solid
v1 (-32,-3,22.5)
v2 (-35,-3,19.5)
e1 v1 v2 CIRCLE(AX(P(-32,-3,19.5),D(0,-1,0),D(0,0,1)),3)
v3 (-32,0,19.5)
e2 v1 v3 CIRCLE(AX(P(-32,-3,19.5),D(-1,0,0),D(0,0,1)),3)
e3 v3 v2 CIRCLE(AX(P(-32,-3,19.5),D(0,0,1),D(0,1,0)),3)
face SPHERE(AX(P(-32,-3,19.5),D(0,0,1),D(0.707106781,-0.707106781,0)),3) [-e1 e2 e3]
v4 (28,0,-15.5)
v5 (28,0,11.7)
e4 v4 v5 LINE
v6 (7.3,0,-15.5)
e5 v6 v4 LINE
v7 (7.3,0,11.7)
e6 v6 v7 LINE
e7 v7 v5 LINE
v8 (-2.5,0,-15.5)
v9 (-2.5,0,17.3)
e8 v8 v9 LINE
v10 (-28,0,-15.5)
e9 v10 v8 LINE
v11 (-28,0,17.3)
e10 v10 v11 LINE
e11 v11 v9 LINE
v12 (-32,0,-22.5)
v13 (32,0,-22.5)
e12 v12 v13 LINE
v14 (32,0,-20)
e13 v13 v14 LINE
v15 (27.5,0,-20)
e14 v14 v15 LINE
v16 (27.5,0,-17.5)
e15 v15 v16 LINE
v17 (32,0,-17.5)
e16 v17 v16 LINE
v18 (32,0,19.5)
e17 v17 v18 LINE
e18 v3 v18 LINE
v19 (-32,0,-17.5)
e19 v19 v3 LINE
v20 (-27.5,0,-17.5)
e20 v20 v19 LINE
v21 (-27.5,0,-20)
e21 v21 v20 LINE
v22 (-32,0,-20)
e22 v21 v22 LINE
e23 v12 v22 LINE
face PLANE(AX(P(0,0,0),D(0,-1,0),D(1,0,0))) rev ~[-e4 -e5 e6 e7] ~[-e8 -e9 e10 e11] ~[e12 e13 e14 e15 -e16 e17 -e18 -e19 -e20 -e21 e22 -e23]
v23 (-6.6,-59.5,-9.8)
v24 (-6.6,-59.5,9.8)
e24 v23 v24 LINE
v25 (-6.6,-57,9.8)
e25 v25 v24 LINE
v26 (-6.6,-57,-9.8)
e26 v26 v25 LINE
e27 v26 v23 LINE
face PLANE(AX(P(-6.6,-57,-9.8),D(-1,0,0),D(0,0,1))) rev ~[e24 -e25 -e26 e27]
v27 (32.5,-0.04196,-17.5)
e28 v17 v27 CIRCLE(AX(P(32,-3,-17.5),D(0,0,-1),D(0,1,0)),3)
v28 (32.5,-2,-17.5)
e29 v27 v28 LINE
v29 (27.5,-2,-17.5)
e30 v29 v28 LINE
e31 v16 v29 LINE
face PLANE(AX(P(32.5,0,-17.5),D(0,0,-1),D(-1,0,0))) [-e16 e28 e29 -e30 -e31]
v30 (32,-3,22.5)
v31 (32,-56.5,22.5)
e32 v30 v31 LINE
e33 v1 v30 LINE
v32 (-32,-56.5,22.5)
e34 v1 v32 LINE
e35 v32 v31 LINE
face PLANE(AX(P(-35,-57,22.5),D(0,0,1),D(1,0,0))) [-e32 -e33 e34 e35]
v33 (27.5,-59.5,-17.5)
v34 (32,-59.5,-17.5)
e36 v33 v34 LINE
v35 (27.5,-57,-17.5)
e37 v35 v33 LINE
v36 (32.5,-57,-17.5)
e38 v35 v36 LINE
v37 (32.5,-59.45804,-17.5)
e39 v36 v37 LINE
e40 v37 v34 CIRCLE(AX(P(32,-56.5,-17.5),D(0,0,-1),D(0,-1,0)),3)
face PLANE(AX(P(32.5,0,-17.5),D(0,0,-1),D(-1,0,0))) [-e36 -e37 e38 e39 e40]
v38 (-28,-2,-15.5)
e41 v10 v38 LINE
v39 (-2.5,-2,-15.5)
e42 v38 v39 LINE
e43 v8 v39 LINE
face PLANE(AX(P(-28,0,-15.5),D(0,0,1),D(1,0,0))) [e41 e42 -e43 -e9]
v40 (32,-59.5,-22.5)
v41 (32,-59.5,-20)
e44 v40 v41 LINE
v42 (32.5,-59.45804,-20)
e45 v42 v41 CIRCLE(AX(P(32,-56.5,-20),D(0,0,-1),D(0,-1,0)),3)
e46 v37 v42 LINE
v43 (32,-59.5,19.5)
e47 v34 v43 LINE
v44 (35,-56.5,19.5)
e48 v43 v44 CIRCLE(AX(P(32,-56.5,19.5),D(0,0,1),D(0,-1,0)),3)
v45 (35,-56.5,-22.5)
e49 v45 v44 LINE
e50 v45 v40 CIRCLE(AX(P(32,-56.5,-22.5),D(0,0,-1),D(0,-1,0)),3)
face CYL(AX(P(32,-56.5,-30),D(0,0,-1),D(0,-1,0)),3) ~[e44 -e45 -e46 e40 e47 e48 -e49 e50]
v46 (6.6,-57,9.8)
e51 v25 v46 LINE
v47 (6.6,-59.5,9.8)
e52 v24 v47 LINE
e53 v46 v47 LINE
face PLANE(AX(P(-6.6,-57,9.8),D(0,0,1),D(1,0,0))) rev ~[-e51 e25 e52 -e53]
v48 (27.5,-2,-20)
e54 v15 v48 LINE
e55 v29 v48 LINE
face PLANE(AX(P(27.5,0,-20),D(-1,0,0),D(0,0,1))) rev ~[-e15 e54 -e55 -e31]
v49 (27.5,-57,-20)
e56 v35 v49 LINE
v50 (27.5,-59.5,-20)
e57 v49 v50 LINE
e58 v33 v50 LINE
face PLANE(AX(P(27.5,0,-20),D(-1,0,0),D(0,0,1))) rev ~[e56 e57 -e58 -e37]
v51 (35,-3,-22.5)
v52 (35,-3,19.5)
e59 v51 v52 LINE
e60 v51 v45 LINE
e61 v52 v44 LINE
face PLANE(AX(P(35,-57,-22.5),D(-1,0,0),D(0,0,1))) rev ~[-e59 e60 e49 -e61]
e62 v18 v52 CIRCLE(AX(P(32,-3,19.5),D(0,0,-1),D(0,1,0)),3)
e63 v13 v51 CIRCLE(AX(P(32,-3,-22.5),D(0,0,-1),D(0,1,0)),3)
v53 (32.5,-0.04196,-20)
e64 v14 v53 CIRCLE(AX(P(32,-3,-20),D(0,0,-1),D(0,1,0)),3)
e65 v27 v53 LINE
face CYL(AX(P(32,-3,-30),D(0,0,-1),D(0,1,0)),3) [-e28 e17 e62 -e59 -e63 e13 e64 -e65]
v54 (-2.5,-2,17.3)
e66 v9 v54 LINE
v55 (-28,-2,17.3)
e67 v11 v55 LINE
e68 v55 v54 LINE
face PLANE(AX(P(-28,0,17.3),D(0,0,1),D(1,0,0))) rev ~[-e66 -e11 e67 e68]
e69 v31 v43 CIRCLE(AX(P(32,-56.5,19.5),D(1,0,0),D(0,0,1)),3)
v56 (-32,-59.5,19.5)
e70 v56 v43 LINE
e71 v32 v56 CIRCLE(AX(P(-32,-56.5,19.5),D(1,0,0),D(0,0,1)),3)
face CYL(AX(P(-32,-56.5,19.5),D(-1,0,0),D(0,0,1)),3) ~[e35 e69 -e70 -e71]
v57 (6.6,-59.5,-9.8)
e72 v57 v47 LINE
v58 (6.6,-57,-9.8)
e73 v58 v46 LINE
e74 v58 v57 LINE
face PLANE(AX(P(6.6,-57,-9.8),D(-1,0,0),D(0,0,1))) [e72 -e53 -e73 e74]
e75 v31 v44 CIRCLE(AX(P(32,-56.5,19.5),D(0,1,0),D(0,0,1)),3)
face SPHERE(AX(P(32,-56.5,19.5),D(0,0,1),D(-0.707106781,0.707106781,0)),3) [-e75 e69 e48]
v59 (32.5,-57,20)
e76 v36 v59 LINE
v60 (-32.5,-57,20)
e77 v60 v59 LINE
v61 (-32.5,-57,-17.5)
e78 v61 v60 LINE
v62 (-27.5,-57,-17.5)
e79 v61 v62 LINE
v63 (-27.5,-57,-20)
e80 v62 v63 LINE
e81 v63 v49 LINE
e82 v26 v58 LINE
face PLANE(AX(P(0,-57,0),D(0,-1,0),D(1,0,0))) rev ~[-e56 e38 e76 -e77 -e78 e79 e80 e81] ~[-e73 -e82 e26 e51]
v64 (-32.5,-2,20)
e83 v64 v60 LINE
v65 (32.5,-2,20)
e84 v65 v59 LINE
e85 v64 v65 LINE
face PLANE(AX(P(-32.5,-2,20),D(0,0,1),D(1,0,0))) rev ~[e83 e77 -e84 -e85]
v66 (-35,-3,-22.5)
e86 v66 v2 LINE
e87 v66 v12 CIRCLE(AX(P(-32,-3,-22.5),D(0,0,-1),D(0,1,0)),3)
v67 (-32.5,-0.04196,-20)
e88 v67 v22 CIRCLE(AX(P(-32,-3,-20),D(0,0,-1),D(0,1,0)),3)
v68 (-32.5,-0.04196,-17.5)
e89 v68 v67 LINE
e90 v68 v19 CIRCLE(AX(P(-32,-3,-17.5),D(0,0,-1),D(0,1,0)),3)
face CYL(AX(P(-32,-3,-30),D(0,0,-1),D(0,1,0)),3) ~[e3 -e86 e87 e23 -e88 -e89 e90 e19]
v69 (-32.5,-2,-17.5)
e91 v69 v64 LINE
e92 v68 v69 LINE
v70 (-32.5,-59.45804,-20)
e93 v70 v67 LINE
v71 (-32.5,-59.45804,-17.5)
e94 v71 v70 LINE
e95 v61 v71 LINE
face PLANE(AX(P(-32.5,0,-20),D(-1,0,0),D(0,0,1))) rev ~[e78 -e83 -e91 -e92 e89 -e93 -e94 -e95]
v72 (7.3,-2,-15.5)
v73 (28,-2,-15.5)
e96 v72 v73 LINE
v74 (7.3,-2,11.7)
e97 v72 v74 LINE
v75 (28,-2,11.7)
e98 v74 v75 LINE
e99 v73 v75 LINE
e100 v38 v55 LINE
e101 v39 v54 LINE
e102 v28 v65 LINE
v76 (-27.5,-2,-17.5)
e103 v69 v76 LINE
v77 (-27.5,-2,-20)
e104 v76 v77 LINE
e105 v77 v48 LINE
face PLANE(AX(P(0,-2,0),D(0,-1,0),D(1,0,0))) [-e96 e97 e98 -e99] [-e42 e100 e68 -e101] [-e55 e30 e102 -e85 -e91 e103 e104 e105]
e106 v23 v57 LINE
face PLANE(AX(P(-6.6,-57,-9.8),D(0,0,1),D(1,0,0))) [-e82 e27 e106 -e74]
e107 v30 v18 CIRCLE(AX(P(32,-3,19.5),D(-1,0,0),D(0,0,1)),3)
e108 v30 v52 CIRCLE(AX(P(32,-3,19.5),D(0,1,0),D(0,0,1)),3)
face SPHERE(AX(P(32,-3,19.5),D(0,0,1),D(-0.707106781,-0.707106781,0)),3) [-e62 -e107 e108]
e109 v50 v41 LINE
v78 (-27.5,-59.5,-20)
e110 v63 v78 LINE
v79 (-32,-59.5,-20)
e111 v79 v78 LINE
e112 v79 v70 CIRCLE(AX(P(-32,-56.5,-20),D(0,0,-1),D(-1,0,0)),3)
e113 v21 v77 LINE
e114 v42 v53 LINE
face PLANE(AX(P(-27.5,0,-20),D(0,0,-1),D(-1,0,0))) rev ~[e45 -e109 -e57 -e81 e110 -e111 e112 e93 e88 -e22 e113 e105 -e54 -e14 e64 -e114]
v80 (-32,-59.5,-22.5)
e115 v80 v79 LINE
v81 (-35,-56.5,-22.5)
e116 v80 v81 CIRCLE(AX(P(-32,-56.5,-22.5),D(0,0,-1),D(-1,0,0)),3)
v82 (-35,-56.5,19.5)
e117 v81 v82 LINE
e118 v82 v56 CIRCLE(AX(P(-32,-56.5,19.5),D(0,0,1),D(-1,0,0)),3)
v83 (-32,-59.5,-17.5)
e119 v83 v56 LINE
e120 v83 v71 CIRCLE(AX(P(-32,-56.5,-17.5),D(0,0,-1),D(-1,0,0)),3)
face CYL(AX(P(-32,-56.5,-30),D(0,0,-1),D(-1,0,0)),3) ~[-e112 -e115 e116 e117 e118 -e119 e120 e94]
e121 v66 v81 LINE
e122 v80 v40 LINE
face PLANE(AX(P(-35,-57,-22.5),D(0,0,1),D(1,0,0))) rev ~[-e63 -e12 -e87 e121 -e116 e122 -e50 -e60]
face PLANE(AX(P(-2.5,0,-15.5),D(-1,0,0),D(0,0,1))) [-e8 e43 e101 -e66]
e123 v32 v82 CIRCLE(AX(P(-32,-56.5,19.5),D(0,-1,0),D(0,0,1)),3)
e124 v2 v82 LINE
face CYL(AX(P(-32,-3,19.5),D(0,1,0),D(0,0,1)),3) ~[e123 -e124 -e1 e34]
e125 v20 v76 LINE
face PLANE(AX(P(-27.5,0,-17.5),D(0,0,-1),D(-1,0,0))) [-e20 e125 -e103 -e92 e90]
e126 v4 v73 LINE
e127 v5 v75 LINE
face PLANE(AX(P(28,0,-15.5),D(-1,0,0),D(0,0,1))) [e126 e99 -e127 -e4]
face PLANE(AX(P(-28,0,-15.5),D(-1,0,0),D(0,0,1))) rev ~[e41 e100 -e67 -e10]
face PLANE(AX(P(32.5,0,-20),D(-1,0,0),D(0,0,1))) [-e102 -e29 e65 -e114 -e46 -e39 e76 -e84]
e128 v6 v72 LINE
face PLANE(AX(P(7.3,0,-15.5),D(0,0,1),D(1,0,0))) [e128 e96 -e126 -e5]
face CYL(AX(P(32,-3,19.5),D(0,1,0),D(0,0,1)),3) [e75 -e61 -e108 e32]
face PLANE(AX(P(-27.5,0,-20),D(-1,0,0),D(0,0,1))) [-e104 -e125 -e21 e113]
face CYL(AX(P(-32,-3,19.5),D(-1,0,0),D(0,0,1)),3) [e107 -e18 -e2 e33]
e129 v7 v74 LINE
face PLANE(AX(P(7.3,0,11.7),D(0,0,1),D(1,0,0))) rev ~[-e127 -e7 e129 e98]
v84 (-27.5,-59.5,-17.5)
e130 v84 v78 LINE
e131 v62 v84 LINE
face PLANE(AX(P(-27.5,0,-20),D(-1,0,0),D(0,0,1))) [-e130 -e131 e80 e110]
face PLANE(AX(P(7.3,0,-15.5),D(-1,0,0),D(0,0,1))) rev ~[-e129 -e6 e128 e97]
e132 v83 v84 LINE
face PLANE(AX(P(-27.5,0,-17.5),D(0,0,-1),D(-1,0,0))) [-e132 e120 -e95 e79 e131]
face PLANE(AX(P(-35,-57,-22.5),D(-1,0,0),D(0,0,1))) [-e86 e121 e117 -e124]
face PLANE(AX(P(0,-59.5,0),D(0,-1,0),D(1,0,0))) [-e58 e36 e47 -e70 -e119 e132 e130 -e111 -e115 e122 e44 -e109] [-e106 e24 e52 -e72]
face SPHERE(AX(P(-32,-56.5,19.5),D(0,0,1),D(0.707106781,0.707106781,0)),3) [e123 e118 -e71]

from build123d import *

# Parameters (mm, degrees)
F0_W         = 70
F0_H         = 45
F0_W_2       = 20.7
F0_H_2       = 27.2
F0_W_3       = 25.5
F0_H_3       = 32.8
F1_DEPTH     = 2
F2_W         = 70
F2_H         = 45
F2_W_2       = 65
F2_H_2       = 40
F3_DEPTH     = 55
F4_W         = 70
F4_H         = 45
F4_W_2       = 13.2
F4_H_2       = 19.6
F5_DEPTH     = 2.5
F6_W         = 5
F6_H         = 2.5
F7_DEPTH     = 59.501
F8_T1_DEPTH  = 64
F8_T3_DEPTH  = 49.5
F8_T5_DEPTH  = 53.5
F8_S9_W      = 3
F8_S9_H      = 3
F8_T10_DEPTH = 3
F8_S15_W     = 3
F8_S15_H     = 3
F8_T16_DEPTH = 3
F8_S21_W     = 3
F8_S21_H     = 3
F8_T22_DEPTH = 3
F8_S27_W     = 3
F8_S27_H     = 3
F8_T28_DEPTH = 3


# Not quite as in the source:
# - a fillet or chamfer that OpenCascade refuses, or shapes differently, is made with other operations: its cross-section is extruded or revolved along the edge and cut away or added


with BuildPart() as f1:
    # F0 (on Front) → F1 (new body)
    with BuildSketch(Plane.XZ):
        Rectangle(F0_W, F0_H)
        with Locations((17.65, -1.9)):
            Rectangle(F0_W_2, F0_H_2, mode=Mode.SUBTRACT)
        with Locations((-15.25, 0.9)):
            Rectangle(F0_W_3, F0_H_3, mode=Mode.SUBTRACT)
    extrude(amount=F1_DEPTH)

    # F2 (on face) → F3 (join)
    with BuildSketch(Plane.XZ.offset(2)):
        Rectangle(F2_W, F2_H)
        Rectangle(F2_W_2, F2_H_2, mode=Mode.SUBTRACT)
    extrude(amount=F3_DEPTH)

    # F4 (on face) → F5 (join)
    with BuildSketch(Plane.XZ.offset(57)):
        Rectangle(F4_W, F4_H)
        Rectangle(F4_W_2, F4_H_2, mode=Mode.SUBTRACT)
    extrude(amount=F5_DEPTH)

    # F6 (on face) → F7 (cut, through all)
    with BuildSketch(Plane(origin=(0, 0, 0), x_dir=(-1, 0, 0), z_dir=(0, 1, 0))):
        with Locations((-30, -18.75)):
            Rectangle(F6_W, F6_H)
        with Locations((30, -18.75)):
            Rectangle(F6_W, F6_H)
    extrude(amount=-F7_DEPTH, mode=Mode.SUBTRACT)

    # F8: fillet of radius 3 on 8 edges, made by hand

    # F8_s2 → F8_t1 (cut)
    with BuildSketch(Plane.YZ.offset(-32)):
        with BuildLine():
            ThreePointArc((-56.5, 22.5), (-58.6213203436, 21.6213203436), (-59.5, 19.5))
            Line((-59.5, 19.5), (-59.5, 22.5))
            Line((-59.5, 22.5), (-56.5, 22.5))
        make_face()
        with BuildLine():
            ThreePointArc((-3, 22.5), (-0.8786796564, 21.6213203436), (0, 19.5))
            Line((0, 19.5), (0, 22.5))
            Line((0, 22.5), (-3, 22.5))
        make_face()
    extrude(amount=F8_T1_DEPTH, mode=Mode.SUBTRACT)

    # F8_s4 → F8_t3 (cut)
    with BuildSketch(Plane.XY.offset(-30)):
        with BuildLine():
            ThreePointArc((32, -59.5), (34.1213203436, -58.6213203436), (35, -56.5))
            Line((35, -56.5), (35, -59.5))
            Line((35, -59.5), (32, -59.5))
        make_face()
        with BuildLine():
            ThreePointArc((-35, -56.5), (-34.1213203436, -58.6213203436), (-32, -59.5))
            Line((-32, -59.5), (-35, -59.5))
            Line((-35, -59.5), (-35, -56.5))
        make_face()
        with BuildLine():
            ThreePointArc((32, 0), (34.1213203436, -0.8786796564), (35, -3))
            Line((35, -3), (35, 0))
            Line((35, 0), (32, 0))
        make_face()
        with BuildLine():
            ThreePointArc((-32, 0), (-34.1213203436, -0.8786796564), (-35, -3))
            Line((-35, -3), (-35, 0))
            Line((-35, 0), (-32, 0))
        make_face()
    extrude(amount=F8_T3_DEPTH, mode=Mode.SUBTRACT)

    # F8_s6 → F8_t5 (cut)
    with BuildSketch(Plane.XZ.offset(3)):
        with BuildLine():
            ThreePointArc((32, 22.5), (34.1213203436, 21.6213203436), (35, 19.5))
            Line((35, 19.5), (35, 22.5))
            Line((35, 22.5), (32, 22.5))
        make_face()
        with BuildLine():
            ThreePointArc((-32, 22.5), (-34.1213203436, 21.6213203436), (-35, 19.5))
            Line((-35, 19.5), (-35, 22.5))
            Line((-35, 22.5), (-32, 22.5))
        make_face()
    extrude(amount=F8_T5_DEPTH, mode=Mode.SUBTRACT)


with BuildPart() as f8_tool8:
    # F8_s9 → F8_t10 (new body)
    with BuildSketch(Plane.XY.offset(19.5)):
        with Locations((33.5, -58)):
            Rectangle(F8_S9_W, F8_S9_H)
    extrude(amount=F8_T10_DEPTH)

    # F8_s11 → F8_t12 (revolve, cut)
    with BuildSketch(Plane(origin=(32, -56.5, 19.5), x_dir=(-0.7071067812, 0.7071067812, 0), z_dir=(0.7071067812, 0.7071067812, 0))):
        with BuildLine():
            ThreePointArc((0, -3), (3, 0), (0, 3))
            Line((0, 3), (0, -3))
        make_face()
    revolve(axis=Axis((32, -56.5, 19.5), (0, 0, 1)), mode=Mode.SUBTRACT)


with BuildPart() as f1_1:
    add(f1.part)

    # F8_t7: cut F8_tool8
    add(f8_tool8.part, mode=Mode.SUBTRACT)


with BuildPart() as f8_tool14:
    # F8_s15 → F8_t16 (new body)
    with BuildSketch(Plane.XY.offset(19.5)):
        with Locations((-33.5, -58)):
            Rectangle(F8_S15_W, F8_S15_H)
    extrude(amount=F8_T16_DEPTH)

    # F8_s17 → F8_t18 (revolve, cut)
    with BuildSketch(Plane(origin=(-32, -56.5, 19.5), x_dir=(0.7071067812, 0.7071067812, 0), z_dir=(0.7071067812, -0.7071067812, 0))):
        with BuildLine():
            ThreePointArc((0, -3), (3, 0), (0, 3))
            Line((0, 3), (0, -3))
        make_face()
    revolve(axis=Axis((-32, -56.5, 19.5), (0, 0, 1)), mode=Mode.SUBTRACT)


with BuildPart() as f1_2:
    add(f1_1.part)

    # F8_t13: cut F8_tool14
    add(f8_tool14.part, mode=Mode.SUBTRACT)


with BuildPart() as f8_tool20:
    # F8_s21 → F8_t22 (new body)
    with BuildSketch(Plane.XY.offset(19.5)):
        with Locations((33.5, -1.5)):
            Rectangle(F8_S21_W, F8_S21_H)
    extrude(amount=F8_T22_DEPTH)

    # F8_s23 → F8_t24 (revolve, cut)
    with BuildSketch(Plane(origin=(32, -3, 19.5), x_dir=(-0.7071067812, -0.7071067812, 0), z_dir=(-0.7071067812, 0.7071067812, 0))):
        with BuildLine():
            ThreePointArc((0, -3), (3, 0), (0, 3))
            Line((0, 3), (0, -3))
        make_face()
    revolve(axis=Axis((32, -3, 19.5), (0, 0, 1)), mode=Mode.SUBTRACT)


with BuildPart() as f1_3:
    add(f1_2.part)

    # F8_t19: cut F8_tool20
    add(f8_tool20.part, mode=Mode.SUBTRACT)


with BuildPart() as f8_tool26:
    # F8_s27 → F8_t28 (new body)
    with BuildSketch(Plane.XY.offset(19.5)):
        with Locations((-33.5, -1.5)):
            Rectangle(F8_S27_W, F8_S27_H)
    extrude(amount=F8_T28_DEPTH)

    # F8_s29 → F8_t30 (revolve, cut)
    with BuildSketch(Plane(origin=(-32, -3, 19.5), x_dir=(0.7071067812, -0.7071067812, 0), z_dir=(-0.7071067812, -0.7071067812, 0))):
        with BuildLine():
            ThreePointArc((0, -3), (3, 0), (0, 3))
            Line((0, 3), (0, -3))
        make_face()
    revolve(axis=Axis((-32, -3, 19.5), (0, 0, 1)), mode=Mode.SUBTRACT)


with BuildPart() as f1_4:
    add(f1_3.part)

    # F8_t25: cut F8_tool26
    add(f8_tool26.part, mode=Mode.SUBTRACT)


solid = f1_4.part
